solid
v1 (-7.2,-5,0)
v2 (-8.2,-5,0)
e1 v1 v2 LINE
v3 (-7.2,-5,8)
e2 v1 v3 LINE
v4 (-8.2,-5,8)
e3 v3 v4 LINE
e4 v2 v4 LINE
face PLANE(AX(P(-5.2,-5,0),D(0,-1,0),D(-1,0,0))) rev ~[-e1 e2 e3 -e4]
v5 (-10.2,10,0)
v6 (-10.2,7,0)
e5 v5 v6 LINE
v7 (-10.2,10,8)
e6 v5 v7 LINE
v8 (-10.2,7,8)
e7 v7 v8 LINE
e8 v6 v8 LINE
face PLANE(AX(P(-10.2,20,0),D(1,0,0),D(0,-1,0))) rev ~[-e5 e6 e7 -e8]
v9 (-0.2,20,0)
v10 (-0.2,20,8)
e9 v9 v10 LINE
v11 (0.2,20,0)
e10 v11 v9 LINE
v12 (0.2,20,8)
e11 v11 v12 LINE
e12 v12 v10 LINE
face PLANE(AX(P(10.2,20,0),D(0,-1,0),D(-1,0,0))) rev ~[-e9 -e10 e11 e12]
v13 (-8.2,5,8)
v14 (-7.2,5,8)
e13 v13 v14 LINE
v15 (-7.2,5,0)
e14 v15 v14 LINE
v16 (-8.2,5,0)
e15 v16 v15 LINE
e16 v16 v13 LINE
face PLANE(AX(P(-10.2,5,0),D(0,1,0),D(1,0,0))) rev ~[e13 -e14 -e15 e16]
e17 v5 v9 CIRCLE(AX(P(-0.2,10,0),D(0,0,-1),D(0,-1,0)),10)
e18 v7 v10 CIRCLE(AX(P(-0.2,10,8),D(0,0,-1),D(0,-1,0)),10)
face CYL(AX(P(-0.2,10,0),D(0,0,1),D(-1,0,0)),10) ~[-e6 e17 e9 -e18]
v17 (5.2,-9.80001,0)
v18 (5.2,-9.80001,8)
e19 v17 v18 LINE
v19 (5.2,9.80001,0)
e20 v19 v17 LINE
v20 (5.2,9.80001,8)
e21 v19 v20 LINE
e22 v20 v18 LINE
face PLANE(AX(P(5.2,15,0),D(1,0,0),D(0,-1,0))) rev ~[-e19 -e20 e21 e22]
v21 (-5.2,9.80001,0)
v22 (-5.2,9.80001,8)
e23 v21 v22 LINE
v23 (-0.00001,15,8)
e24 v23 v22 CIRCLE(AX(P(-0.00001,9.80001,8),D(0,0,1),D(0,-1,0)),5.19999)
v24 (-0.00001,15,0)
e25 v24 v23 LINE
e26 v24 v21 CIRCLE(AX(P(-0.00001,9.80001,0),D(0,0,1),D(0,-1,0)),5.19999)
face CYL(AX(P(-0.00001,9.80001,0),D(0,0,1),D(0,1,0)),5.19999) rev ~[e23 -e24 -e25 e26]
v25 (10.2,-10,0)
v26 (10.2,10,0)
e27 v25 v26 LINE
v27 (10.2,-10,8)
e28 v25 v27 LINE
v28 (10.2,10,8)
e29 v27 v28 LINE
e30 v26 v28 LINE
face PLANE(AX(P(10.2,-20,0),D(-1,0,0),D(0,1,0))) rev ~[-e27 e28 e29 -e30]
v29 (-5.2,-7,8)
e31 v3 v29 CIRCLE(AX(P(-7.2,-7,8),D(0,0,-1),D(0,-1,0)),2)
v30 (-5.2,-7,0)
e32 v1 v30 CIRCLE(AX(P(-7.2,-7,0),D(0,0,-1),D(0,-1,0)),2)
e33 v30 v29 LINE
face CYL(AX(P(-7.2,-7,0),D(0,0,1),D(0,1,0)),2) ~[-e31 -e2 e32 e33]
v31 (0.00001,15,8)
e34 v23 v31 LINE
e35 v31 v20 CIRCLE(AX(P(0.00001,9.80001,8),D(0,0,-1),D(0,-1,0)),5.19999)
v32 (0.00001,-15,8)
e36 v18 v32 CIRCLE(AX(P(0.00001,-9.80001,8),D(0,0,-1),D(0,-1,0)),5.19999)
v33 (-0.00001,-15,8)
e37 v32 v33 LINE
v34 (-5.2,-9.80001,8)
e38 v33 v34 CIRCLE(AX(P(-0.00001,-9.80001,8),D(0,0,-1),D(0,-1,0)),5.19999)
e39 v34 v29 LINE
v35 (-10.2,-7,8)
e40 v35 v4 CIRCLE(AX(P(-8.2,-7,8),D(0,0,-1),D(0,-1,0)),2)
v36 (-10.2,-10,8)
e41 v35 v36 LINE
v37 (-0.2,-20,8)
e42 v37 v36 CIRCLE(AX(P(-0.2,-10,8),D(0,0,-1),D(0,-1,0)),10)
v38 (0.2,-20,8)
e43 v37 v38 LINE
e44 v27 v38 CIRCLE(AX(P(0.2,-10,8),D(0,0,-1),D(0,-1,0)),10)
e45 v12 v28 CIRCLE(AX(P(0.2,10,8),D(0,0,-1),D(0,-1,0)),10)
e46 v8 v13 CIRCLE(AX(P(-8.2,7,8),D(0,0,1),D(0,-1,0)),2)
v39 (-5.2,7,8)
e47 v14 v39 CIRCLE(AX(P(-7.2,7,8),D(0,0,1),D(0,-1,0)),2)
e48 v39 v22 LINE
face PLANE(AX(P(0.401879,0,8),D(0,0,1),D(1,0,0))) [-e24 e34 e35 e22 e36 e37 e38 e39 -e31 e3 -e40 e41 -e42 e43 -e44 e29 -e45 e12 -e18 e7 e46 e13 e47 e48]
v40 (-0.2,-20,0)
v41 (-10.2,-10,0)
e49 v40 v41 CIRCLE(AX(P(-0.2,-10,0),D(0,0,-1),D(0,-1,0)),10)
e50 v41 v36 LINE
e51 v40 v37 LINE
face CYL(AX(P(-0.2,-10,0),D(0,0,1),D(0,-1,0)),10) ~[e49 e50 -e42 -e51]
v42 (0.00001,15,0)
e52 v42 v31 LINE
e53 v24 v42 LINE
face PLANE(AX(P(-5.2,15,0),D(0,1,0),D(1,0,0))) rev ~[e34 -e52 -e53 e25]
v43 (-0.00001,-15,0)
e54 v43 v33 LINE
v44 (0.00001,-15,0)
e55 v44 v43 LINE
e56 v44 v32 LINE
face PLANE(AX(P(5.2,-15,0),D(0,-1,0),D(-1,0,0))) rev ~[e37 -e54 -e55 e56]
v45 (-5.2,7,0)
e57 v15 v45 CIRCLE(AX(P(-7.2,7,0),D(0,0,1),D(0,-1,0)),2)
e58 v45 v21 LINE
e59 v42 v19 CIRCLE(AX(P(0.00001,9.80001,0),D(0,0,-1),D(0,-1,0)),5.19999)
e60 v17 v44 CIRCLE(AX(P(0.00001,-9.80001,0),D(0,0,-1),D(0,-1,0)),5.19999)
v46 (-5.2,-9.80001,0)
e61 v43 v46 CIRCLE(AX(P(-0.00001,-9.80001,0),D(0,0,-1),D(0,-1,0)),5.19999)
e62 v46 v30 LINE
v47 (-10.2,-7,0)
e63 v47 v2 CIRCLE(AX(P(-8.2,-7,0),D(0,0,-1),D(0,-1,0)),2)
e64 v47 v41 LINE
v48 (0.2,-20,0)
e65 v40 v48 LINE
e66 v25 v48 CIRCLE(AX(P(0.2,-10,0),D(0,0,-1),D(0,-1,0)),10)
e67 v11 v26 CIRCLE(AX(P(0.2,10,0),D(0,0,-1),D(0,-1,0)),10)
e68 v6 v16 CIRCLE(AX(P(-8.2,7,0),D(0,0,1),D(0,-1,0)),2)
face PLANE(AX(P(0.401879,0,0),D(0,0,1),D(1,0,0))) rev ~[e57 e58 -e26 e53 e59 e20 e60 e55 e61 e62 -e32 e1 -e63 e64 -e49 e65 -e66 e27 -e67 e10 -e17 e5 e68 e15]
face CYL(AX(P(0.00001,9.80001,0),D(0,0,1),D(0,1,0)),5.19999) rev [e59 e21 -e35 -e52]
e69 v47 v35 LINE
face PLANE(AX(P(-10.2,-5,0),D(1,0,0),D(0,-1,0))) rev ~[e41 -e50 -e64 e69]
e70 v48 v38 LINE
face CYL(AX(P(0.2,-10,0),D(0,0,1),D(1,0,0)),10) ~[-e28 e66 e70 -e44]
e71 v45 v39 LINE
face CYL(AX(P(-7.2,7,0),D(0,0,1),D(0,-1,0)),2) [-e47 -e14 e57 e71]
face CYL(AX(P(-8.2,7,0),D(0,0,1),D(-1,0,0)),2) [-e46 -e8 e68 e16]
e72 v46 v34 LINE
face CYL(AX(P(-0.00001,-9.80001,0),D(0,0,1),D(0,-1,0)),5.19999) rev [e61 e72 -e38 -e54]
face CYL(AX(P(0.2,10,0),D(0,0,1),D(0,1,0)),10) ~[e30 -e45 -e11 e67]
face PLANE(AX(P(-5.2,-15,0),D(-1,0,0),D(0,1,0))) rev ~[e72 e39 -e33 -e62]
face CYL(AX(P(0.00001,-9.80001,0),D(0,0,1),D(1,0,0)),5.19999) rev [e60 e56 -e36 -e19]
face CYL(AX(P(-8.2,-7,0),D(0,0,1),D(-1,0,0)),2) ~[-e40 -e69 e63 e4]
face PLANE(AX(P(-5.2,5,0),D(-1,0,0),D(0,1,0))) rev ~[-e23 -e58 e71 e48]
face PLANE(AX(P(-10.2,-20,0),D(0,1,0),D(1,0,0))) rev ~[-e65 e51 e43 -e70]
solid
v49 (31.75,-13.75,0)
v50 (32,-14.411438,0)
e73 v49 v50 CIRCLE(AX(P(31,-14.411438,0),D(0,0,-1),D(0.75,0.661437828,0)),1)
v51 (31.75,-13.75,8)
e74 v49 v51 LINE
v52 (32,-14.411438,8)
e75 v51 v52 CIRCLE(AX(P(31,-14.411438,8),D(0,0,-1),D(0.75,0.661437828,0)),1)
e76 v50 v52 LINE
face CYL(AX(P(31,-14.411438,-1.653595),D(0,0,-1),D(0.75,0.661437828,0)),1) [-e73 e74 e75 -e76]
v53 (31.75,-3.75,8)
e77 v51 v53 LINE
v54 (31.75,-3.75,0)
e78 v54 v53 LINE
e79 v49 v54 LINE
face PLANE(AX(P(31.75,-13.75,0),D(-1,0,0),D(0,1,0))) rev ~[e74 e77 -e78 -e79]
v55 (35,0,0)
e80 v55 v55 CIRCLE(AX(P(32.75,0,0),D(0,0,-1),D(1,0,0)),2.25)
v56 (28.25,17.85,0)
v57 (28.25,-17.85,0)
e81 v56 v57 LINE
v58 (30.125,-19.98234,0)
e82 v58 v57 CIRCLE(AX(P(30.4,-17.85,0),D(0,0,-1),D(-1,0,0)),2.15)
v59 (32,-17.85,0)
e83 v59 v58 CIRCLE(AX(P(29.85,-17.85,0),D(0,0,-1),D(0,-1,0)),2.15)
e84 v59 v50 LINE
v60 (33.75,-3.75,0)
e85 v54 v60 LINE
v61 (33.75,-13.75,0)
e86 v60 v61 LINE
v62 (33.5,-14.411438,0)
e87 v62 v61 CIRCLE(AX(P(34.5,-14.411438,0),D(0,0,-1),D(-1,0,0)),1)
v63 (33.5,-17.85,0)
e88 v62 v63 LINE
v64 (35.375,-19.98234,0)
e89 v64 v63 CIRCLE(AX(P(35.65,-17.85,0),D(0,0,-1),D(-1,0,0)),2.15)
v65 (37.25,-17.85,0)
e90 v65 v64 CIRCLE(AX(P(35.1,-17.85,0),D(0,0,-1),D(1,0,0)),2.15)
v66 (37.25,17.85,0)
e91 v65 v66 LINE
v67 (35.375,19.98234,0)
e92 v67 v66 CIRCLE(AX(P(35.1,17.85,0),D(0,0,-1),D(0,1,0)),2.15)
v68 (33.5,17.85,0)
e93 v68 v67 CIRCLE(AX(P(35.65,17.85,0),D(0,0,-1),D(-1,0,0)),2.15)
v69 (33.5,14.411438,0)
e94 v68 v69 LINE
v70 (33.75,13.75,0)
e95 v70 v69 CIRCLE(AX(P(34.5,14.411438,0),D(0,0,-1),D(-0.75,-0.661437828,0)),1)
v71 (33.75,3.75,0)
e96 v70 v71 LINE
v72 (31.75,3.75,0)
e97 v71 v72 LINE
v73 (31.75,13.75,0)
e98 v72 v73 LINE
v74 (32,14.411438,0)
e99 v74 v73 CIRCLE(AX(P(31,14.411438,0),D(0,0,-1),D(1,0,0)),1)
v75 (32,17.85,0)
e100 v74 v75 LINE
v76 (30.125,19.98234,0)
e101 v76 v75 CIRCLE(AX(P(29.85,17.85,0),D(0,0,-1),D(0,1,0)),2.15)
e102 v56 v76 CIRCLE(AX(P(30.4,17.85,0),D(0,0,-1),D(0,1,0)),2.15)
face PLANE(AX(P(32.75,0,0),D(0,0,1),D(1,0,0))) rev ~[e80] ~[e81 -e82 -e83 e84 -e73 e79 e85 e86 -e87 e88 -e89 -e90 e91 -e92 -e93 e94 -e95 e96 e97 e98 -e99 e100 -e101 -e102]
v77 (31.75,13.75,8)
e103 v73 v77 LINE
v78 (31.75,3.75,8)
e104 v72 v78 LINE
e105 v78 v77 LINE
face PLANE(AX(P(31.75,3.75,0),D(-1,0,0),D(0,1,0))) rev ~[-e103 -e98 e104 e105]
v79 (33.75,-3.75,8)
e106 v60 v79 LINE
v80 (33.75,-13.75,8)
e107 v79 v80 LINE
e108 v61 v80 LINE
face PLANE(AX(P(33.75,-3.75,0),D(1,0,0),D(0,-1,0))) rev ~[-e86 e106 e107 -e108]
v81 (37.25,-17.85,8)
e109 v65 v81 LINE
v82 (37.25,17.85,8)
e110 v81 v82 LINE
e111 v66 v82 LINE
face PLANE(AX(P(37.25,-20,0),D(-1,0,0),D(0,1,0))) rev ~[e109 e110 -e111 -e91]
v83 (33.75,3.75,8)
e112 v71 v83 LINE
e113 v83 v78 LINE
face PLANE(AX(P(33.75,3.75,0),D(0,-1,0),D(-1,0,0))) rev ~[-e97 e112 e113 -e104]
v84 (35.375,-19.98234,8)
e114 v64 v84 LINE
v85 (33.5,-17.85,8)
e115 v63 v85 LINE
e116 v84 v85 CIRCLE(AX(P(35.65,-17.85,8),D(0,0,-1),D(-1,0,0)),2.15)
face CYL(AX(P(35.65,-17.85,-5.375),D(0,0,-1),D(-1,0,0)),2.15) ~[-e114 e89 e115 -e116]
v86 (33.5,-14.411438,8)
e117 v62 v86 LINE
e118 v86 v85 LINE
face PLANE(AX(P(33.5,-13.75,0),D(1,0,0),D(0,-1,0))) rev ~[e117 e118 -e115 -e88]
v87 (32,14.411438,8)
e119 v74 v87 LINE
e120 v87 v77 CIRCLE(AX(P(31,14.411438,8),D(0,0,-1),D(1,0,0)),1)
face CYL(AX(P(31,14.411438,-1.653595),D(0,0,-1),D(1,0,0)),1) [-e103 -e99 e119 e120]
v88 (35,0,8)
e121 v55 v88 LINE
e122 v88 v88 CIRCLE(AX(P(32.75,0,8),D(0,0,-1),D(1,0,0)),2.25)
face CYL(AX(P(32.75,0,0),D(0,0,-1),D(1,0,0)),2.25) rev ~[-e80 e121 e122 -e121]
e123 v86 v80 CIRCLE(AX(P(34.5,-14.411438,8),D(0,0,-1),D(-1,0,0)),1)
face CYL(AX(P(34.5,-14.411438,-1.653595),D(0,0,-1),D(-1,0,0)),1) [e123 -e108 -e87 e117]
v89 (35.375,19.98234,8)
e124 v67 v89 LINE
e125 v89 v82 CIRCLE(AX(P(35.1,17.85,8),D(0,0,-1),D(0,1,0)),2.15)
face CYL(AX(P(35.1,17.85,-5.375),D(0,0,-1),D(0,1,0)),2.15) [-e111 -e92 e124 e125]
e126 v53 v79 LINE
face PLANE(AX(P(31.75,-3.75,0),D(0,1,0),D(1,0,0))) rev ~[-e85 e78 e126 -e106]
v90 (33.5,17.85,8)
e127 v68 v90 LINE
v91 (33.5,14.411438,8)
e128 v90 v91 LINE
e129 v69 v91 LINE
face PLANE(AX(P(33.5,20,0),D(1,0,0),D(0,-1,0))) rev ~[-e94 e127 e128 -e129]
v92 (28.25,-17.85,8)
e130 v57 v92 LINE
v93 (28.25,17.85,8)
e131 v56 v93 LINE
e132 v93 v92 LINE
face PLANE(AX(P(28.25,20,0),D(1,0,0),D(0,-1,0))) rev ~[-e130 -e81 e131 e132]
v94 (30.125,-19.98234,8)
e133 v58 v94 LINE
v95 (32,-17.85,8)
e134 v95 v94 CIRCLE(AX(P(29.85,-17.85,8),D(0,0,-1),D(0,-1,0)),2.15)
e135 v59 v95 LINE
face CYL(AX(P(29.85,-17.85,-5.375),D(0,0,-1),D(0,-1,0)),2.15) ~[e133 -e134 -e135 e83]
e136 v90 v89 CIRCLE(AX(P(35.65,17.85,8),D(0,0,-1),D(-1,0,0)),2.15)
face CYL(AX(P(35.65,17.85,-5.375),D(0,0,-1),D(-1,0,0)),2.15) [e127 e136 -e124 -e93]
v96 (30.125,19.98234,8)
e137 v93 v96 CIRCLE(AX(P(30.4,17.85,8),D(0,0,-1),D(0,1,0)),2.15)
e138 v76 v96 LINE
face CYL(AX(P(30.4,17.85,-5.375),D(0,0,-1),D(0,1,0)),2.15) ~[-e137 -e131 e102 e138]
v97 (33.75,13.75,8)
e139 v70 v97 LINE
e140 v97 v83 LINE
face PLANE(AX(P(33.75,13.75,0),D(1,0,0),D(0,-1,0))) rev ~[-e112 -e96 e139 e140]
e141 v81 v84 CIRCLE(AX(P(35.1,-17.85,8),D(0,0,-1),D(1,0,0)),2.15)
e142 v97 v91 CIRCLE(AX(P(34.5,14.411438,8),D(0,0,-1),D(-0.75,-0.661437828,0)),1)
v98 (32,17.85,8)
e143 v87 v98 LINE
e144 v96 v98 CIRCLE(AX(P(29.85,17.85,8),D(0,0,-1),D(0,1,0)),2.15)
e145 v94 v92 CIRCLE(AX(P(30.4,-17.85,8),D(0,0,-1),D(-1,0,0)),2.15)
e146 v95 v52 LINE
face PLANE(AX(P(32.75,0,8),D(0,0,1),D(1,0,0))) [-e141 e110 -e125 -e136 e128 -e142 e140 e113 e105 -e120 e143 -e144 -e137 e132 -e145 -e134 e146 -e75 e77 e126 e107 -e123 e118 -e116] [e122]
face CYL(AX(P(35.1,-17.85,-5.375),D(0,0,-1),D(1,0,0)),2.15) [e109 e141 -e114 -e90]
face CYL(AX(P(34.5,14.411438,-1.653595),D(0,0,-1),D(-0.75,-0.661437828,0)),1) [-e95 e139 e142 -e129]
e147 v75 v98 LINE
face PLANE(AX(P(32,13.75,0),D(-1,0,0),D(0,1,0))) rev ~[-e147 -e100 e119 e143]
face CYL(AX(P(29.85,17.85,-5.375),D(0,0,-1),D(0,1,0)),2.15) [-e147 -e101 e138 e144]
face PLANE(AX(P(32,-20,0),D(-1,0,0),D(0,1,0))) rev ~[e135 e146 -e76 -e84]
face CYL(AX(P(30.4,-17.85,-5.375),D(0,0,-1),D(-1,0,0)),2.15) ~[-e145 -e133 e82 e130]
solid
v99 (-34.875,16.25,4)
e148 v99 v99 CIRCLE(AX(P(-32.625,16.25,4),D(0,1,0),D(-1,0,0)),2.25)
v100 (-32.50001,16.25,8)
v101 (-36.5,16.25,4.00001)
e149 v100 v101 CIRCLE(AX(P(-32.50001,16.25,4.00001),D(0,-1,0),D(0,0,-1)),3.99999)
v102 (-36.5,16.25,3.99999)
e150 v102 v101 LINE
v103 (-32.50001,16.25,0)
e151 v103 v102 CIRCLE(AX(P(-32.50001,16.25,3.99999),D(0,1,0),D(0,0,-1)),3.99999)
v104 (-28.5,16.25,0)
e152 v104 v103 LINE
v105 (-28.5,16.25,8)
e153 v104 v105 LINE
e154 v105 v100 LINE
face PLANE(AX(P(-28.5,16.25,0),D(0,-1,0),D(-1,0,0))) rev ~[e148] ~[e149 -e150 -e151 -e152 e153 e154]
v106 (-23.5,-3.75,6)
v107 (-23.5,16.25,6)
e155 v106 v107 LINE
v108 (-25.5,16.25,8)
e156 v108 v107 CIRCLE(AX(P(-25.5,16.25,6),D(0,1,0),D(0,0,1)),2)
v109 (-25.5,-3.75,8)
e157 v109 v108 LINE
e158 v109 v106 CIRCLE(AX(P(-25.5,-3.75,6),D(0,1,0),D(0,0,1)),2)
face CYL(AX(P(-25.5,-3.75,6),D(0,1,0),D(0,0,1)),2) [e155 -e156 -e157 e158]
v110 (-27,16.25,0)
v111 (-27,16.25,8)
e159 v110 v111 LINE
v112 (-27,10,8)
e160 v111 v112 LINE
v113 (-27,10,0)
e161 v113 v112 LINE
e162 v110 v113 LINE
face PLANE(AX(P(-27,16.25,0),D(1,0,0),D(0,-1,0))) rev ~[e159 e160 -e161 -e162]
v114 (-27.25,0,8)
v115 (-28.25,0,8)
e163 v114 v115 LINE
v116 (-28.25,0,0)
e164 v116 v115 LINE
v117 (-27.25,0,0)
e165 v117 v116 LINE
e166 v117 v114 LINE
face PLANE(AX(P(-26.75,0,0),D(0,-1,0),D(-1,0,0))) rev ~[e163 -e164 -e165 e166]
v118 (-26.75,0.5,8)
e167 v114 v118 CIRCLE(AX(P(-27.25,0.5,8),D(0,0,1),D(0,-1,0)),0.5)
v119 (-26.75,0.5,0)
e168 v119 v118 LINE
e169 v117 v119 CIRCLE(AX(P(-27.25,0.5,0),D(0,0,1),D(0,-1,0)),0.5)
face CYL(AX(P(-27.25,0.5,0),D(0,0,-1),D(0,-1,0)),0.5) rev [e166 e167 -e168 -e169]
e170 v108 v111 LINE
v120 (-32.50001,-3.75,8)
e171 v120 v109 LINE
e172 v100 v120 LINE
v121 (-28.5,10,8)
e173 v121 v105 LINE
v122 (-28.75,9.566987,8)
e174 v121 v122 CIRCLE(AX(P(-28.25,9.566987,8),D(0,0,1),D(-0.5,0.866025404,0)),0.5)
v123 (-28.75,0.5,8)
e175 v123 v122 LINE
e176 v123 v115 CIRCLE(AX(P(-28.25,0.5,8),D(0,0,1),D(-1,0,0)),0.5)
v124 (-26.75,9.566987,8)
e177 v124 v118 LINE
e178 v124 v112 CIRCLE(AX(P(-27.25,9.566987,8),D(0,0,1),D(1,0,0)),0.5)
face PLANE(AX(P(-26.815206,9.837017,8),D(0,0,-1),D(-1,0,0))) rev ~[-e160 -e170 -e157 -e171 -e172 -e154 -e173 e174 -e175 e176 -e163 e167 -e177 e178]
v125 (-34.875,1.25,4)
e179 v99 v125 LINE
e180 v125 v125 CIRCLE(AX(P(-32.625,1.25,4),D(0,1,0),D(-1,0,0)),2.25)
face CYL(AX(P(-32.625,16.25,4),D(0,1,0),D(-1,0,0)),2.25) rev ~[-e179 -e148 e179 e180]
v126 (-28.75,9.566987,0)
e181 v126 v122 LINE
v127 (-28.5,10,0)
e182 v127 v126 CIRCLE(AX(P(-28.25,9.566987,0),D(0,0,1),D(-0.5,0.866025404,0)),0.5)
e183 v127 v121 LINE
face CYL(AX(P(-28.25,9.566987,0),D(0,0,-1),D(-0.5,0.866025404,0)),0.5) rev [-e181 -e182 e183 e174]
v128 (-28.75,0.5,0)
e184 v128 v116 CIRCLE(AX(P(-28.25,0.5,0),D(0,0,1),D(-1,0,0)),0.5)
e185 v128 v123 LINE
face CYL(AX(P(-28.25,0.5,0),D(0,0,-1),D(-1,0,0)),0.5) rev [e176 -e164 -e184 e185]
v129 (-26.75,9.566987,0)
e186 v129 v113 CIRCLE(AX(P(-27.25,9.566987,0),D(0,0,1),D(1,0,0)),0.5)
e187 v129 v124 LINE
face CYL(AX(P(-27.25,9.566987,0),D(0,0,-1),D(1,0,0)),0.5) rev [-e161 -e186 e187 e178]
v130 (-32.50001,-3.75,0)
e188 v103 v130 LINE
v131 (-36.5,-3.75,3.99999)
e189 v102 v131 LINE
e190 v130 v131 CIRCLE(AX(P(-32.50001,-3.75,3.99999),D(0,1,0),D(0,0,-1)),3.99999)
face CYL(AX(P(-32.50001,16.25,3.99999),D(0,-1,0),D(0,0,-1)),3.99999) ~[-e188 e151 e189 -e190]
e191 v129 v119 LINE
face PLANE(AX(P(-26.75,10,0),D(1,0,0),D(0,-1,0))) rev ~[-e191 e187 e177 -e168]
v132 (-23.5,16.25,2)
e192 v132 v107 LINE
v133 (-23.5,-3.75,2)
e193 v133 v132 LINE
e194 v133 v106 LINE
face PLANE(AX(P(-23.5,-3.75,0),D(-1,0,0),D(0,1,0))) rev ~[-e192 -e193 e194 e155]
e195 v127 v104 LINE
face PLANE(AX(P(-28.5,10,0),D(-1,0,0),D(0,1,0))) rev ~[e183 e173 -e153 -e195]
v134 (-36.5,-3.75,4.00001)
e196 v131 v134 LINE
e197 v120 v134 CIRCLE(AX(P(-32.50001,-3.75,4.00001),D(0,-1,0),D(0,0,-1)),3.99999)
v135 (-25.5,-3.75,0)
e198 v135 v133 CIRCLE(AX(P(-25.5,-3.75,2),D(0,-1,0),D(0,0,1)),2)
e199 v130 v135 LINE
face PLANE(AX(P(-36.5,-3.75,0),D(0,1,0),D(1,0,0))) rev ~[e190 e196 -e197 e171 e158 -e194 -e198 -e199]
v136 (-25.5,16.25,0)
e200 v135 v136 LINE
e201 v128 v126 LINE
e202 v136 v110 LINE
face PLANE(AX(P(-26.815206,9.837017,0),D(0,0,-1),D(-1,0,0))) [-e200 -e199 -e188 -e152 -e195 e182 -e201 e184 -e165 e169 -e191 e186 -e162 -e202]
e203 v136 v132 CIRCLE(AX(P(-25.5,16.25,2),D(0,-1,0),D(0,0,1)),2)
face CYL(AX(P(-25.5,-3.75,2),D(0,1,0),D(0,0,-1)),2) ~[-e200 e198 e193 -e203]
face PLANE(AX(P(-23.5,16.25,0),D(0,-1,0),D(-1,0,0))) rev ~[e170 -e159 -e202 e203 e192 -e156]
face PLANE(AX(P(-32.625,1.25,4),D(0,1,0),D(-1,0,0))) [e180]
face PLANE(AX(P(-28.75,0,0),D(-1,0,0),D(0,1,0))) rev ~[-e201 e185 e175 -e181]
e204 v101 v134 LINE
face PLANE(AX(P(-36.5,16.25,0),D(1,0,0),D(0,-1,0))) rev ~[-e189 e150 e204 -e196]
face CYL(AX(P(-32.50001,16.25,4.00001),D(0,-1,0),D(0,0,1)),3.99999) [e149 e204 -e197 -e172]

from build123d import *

# Parameters (mm, degrees)
F1_DEPTH     = 8
F2_R         = 5.19999
F3_R         = 10
F6_DEPTH     = 8
F7_R         = 2.25
F8_DEPTH     = 8
F9_T1_DEPTH  = 18.75
F10_T1_DEPTH = 11.3071891388
F12_DEPTH    = 8
F13_R        = 2.25
F14_DEPTH    = 15
F15_R        = 3.99999
F16_T1_DEPTH = 8
F17_R        = 2
F17_2_R      = 2


# Not quite as in the source:
# - a fillet or chamfer that OpenCascade refuses, or shapes differently, is made with other operations: its cross-section is extruded or revolved along the edge and cut away or added
# - a fillet or chamfer is up to 0.001 mm smaller than in the source, because OpenCascade refuses the exact size
# - a feature of the source that left no trace in its solid (it failed there, or was rolled back) is left out


with BuildPart() as f1:
    # F0 (on Top) → F1 (new body)
    with BuildSketch(Plane.XY):
        Polygon((-5.2, 15), (5.2, 15), (5.2, -15), (-5.2, -15), (-5.2, -5), (-10.2, -5), (-10.2, -20), (10.2, -20), (10.2, 20), (-10.2, 20), (-10.2, 5), (-5.2, 5), align=None)
    extrude(amount=F1_DEPTH)

    # F2 (radius 5.2 in the source; OpenCascade refuses exactly that, so slightly less here)
    f2_edges = [f1.edges().sort_by_distance(p)[0] for p in [
        (-5.2, 15, 4),
        (5.2, 15, 4),
        (-5.2, -15, 4),
        (5.2, -15, 4),
    ]]
    fillet(f2_edges, radius=F2_R)

    # F3
    f3_edges = [f1.edges().sort_by_distance(p)[0] for p in [
        (-10.2, 20, 4),
        (10.2, 20, 4),
        (10.2, -20, 4),
        (-10.2, -20, 4),
    ]]
    fillet(f3_edges, radius=F3_R)

    # F17#2
    f17_2_edges = [f1.edges().sort_by_distance(p)[0] for p in [
        (-10.2, 5, 4),
        (-5.2, 5, 4),
        (-10.2, -5, 4),
        (-5.2, -5, 4),
    ]]
    fillet(f17_2_edges, radius=F17_2_R)


with BuildPart() as f6:
    # F5 (on Top) → F6 (new body)
    with BuildSketch(Plane.XY):
        Polygon((32, 20), (31.75, 20), (28.25, 20), (28.25, -20), (31.75, -20), (32, -20), (32, -13.75), (31.75, -13.75), (31.75, -3.75), (33.75, -3.75), (33.75, -13.75), (33.5, -13.75), (33.5, -20), (33.75, -20), (37.25, -20), (37.25, 20), (33.75, 20), (33.5, 20), (33.5, 13.75), (33.75, 13.75), (33.75, 3.75), (31.75, 3.75), (31.75, 13.75), (32, 13.75), align=None)
    extrude(amount=F6_DEPTH)

    # F7 (on face) → F8 (cut, through all)
    with BuildSketch(Plane(origin=(0, 0, 0), x_dir=(1, 0, 0), z_dir=(0, 0, -1))):
        with Locations((32.75, 0)):
            Circle(F7_R)
    extrude(amount=-F8_DEPTH, mode=Mode.SUBTRACT)

    # F9: fillet of radius 2.15 on 8 edges, made by hand

    # F9_s2 → F9_t1 (cut)
    with BuildSketch(Plane.XY.offset(-5.375)):
        with BuildLine():
            ThreePointArc((28.25, -17.85), (28.8797204204, -19.3702795796), (30.4, -20))
            Line((30.4, -20), (28.25, -20))
            Line((28.25, -20), (28.25, -17.85))
        make_face()
        with BuildLine():
            ThreePointArc((29.85, -20), (31.3702795796, -19.3702795796), (32, -17.85))
            Line((32, -17.85), (32, -20))
            Line((32, -20), (29.85, -20))
        make_face()
        with BuildLine():
            ThreePointArc((37.25, -17.85), (36.6202795796, -19.3702795796), (35.1, -20))
            Line((35.1, -20), (37.25, -20))
            Line((37.25, -20), (37.25, -17.85))
        make_face()
        with BuildLine():
            ThreePointArc((33.5, -17.85), (34.1297204204, -19.3702795796), (35.65, -20))
            Line((35.65, -20), (33.5, -20))
            Line((33.5, -20), (33.5, -17.85))
        make_face()
        with BuildLine():
            ThreePointArc((35.1, 20), (36.6202795796, 19.3702795796), (37.25, 17.85))
            Line((37.25, 17.85), (37.25, 20))
            Line((37.25, 20), (35.1, 20))
        make_face()
        with BuildLine():
            ThreePointArc((33.5, 17.85), (34.1297204204, 19.3702795796), (35.65, 20))
            Line((35.65, 20), (33.5, 20))
            Line((33.5, 20), (33.5, 17.85))
        make_face()
        with BuildLine():
            ThreePointArc((29.85, 20), (31.3702795796, 19.3702795796), (32, 17.85))
            Line((32, 17.85), (32, 20))
            Line((32, 20), (29.85, 20))
        make_face()
        with BuildLine():
            ThreePointArc((30.4, 20), (28.8797204204, 19.3702795796), (28.25, 17.85))
            Line((28.25, 17.85), (28.25, 20))
            Line((28.25, 20), (30.4, 20))
        make_face()
    extrude(amount=F9_T1_DEPTH, mode=Mode.SUBTRACT)

    # F10: fillet of radius 1 on 4 edges, made by hand

    # F10_s2 → F10_t1 (cut)
    with BuildSketch(Plane.XY.offset(-1.6535945694)):
        with BuildLine():
            ThreePointArc((33.5, -14.4114378278), (33.5645856533, -14.0578844372), (33.75, -13.75))
            Line((33.75, -13.75), (33.5, -13.75))
            Line((33.5, -13.75), (33.5, -14.4114378278))
        make_face()
        with BuildLine():
            ThreePointArc((31.75, -13.75), (31.9354143467, -14.0578844372), (32, -14.4114378278))
            Line((32, -14.4114378278), (32, -13.75))
            Line((32, -13.75), (31.75, -13.75))
        make_face()
        with BuildLine():
            ThreePointArc((32, 14.4114378278), (31.9354143467, 14.0578844372), (31.75, 13.75))
            Line((31.75, 13.75), (32, 13.75))
            Line((32, 13.75), (32, 14.4114378278))
        make_face()
        with BuildLine():
            ThreePointArc((33.75, 13.75), (33.5645856533, 14.0578844372), (33.5, 14.4114378278))
            Line((33.5, 14.4114378278), (33.5, 13.75))
            Line((33.5, 13.75), (33.75, 13.75))
        make_face()
    extrude(amount=F10_T1_DEPTH, mode=Mode.SUBTRACT)


with BuildPart() as f12:
    # F11 (on Top) → F12 (new body)
    with BuildSketch(Plane.XY):
        Polygon((-23.5, -3.75), (-23.5, 16.25), (-27, 16.25), (-27, 10), (-26.75, 10), (-26.75, 0), (-28.75, 0), (-28.75, 10), (-28.5, 10), (-28.5, 16.25), (-36.5, 16.25), (-36.5, -3.75), align=None)
    extrude(amount=F12_DEPTH)

    # F13 (on face) → F14 (cut)
    with BuildSketch(Plane(origin=(0, 16.25, 0), x_dir=(-1, 0, 0), z_dir=(0, 1, 0))):
        with Locations((32.625, 4)):
            Circle(F13_R)
    extrude(amount=-F14_DEPTH, mode=Mode.SUBTRACT)

    # F15 (radius 4 in the source; OpenCascade refuses exactly that, so slightly less here)
    f15_edges = [f12.edges().sort_by_distance(p)[0] for p in [
        (-36.5, 6.25, 8),
        (-36.5, 6.25, 0),
    ]]
    fillet(f15_edges, radius=F15_R)

    # F16: fillet of radius 0.5 on 4 edges, made by hand

    # F16_s2 → F16_t1 (join)
    with BuildSketch(Plane.XY):
        with BuildLine():
            ThreePointArc((-26.75, 9.5669872981), (-26.8169872981, 9.8169872981), (-27, 10))
            Line((-27, 10), (-26.75, 10))
            Line((-26.75, 10), (-26.75, 9.5669872981))
        make_face()
        with BuildLine():
            ThreePointArc((-28.5, 10), (-28.6830127019, 9.8169872981), (-28.75, 9.5669872981))
            Line((-28.75, 9.5669872981), (-28.75, 10))
            Line((-28.75, 10), (-28.5, 10))
        make_face()
        with BuildLine():
            ThreePointArc((-28.75, 0.5), (-28.6035533906, 0.1464466094), (-28.25, 0))
            Line((-28.25, 0), (-28.75, 0))
            Line((-28.75, 0), (-28.75, 0.5))
        make_face()
        with BuildLine():
            ThreePointArc((-27.25, 0), (-26.8964466094, 0.1464466094), (-26.75, 0.5))
            Line((-26.75, 0.5), (-26.75, 0))
            Line((-26.75, 0), (-27.25, 0))
        make_face()
    extrude(amount=F16_T1_DEPTH)

    # F17
    f17_edges = [f12.edges().sort_by_distance(p)[0] for p in [
        (-23.5, 6.25, 8),
        (-23.5, 6.25, 0),
    ]]
    fillet(f17_edges, radius=F17_R)


solid = Compound([f1.part, f6.part, f12.part])
